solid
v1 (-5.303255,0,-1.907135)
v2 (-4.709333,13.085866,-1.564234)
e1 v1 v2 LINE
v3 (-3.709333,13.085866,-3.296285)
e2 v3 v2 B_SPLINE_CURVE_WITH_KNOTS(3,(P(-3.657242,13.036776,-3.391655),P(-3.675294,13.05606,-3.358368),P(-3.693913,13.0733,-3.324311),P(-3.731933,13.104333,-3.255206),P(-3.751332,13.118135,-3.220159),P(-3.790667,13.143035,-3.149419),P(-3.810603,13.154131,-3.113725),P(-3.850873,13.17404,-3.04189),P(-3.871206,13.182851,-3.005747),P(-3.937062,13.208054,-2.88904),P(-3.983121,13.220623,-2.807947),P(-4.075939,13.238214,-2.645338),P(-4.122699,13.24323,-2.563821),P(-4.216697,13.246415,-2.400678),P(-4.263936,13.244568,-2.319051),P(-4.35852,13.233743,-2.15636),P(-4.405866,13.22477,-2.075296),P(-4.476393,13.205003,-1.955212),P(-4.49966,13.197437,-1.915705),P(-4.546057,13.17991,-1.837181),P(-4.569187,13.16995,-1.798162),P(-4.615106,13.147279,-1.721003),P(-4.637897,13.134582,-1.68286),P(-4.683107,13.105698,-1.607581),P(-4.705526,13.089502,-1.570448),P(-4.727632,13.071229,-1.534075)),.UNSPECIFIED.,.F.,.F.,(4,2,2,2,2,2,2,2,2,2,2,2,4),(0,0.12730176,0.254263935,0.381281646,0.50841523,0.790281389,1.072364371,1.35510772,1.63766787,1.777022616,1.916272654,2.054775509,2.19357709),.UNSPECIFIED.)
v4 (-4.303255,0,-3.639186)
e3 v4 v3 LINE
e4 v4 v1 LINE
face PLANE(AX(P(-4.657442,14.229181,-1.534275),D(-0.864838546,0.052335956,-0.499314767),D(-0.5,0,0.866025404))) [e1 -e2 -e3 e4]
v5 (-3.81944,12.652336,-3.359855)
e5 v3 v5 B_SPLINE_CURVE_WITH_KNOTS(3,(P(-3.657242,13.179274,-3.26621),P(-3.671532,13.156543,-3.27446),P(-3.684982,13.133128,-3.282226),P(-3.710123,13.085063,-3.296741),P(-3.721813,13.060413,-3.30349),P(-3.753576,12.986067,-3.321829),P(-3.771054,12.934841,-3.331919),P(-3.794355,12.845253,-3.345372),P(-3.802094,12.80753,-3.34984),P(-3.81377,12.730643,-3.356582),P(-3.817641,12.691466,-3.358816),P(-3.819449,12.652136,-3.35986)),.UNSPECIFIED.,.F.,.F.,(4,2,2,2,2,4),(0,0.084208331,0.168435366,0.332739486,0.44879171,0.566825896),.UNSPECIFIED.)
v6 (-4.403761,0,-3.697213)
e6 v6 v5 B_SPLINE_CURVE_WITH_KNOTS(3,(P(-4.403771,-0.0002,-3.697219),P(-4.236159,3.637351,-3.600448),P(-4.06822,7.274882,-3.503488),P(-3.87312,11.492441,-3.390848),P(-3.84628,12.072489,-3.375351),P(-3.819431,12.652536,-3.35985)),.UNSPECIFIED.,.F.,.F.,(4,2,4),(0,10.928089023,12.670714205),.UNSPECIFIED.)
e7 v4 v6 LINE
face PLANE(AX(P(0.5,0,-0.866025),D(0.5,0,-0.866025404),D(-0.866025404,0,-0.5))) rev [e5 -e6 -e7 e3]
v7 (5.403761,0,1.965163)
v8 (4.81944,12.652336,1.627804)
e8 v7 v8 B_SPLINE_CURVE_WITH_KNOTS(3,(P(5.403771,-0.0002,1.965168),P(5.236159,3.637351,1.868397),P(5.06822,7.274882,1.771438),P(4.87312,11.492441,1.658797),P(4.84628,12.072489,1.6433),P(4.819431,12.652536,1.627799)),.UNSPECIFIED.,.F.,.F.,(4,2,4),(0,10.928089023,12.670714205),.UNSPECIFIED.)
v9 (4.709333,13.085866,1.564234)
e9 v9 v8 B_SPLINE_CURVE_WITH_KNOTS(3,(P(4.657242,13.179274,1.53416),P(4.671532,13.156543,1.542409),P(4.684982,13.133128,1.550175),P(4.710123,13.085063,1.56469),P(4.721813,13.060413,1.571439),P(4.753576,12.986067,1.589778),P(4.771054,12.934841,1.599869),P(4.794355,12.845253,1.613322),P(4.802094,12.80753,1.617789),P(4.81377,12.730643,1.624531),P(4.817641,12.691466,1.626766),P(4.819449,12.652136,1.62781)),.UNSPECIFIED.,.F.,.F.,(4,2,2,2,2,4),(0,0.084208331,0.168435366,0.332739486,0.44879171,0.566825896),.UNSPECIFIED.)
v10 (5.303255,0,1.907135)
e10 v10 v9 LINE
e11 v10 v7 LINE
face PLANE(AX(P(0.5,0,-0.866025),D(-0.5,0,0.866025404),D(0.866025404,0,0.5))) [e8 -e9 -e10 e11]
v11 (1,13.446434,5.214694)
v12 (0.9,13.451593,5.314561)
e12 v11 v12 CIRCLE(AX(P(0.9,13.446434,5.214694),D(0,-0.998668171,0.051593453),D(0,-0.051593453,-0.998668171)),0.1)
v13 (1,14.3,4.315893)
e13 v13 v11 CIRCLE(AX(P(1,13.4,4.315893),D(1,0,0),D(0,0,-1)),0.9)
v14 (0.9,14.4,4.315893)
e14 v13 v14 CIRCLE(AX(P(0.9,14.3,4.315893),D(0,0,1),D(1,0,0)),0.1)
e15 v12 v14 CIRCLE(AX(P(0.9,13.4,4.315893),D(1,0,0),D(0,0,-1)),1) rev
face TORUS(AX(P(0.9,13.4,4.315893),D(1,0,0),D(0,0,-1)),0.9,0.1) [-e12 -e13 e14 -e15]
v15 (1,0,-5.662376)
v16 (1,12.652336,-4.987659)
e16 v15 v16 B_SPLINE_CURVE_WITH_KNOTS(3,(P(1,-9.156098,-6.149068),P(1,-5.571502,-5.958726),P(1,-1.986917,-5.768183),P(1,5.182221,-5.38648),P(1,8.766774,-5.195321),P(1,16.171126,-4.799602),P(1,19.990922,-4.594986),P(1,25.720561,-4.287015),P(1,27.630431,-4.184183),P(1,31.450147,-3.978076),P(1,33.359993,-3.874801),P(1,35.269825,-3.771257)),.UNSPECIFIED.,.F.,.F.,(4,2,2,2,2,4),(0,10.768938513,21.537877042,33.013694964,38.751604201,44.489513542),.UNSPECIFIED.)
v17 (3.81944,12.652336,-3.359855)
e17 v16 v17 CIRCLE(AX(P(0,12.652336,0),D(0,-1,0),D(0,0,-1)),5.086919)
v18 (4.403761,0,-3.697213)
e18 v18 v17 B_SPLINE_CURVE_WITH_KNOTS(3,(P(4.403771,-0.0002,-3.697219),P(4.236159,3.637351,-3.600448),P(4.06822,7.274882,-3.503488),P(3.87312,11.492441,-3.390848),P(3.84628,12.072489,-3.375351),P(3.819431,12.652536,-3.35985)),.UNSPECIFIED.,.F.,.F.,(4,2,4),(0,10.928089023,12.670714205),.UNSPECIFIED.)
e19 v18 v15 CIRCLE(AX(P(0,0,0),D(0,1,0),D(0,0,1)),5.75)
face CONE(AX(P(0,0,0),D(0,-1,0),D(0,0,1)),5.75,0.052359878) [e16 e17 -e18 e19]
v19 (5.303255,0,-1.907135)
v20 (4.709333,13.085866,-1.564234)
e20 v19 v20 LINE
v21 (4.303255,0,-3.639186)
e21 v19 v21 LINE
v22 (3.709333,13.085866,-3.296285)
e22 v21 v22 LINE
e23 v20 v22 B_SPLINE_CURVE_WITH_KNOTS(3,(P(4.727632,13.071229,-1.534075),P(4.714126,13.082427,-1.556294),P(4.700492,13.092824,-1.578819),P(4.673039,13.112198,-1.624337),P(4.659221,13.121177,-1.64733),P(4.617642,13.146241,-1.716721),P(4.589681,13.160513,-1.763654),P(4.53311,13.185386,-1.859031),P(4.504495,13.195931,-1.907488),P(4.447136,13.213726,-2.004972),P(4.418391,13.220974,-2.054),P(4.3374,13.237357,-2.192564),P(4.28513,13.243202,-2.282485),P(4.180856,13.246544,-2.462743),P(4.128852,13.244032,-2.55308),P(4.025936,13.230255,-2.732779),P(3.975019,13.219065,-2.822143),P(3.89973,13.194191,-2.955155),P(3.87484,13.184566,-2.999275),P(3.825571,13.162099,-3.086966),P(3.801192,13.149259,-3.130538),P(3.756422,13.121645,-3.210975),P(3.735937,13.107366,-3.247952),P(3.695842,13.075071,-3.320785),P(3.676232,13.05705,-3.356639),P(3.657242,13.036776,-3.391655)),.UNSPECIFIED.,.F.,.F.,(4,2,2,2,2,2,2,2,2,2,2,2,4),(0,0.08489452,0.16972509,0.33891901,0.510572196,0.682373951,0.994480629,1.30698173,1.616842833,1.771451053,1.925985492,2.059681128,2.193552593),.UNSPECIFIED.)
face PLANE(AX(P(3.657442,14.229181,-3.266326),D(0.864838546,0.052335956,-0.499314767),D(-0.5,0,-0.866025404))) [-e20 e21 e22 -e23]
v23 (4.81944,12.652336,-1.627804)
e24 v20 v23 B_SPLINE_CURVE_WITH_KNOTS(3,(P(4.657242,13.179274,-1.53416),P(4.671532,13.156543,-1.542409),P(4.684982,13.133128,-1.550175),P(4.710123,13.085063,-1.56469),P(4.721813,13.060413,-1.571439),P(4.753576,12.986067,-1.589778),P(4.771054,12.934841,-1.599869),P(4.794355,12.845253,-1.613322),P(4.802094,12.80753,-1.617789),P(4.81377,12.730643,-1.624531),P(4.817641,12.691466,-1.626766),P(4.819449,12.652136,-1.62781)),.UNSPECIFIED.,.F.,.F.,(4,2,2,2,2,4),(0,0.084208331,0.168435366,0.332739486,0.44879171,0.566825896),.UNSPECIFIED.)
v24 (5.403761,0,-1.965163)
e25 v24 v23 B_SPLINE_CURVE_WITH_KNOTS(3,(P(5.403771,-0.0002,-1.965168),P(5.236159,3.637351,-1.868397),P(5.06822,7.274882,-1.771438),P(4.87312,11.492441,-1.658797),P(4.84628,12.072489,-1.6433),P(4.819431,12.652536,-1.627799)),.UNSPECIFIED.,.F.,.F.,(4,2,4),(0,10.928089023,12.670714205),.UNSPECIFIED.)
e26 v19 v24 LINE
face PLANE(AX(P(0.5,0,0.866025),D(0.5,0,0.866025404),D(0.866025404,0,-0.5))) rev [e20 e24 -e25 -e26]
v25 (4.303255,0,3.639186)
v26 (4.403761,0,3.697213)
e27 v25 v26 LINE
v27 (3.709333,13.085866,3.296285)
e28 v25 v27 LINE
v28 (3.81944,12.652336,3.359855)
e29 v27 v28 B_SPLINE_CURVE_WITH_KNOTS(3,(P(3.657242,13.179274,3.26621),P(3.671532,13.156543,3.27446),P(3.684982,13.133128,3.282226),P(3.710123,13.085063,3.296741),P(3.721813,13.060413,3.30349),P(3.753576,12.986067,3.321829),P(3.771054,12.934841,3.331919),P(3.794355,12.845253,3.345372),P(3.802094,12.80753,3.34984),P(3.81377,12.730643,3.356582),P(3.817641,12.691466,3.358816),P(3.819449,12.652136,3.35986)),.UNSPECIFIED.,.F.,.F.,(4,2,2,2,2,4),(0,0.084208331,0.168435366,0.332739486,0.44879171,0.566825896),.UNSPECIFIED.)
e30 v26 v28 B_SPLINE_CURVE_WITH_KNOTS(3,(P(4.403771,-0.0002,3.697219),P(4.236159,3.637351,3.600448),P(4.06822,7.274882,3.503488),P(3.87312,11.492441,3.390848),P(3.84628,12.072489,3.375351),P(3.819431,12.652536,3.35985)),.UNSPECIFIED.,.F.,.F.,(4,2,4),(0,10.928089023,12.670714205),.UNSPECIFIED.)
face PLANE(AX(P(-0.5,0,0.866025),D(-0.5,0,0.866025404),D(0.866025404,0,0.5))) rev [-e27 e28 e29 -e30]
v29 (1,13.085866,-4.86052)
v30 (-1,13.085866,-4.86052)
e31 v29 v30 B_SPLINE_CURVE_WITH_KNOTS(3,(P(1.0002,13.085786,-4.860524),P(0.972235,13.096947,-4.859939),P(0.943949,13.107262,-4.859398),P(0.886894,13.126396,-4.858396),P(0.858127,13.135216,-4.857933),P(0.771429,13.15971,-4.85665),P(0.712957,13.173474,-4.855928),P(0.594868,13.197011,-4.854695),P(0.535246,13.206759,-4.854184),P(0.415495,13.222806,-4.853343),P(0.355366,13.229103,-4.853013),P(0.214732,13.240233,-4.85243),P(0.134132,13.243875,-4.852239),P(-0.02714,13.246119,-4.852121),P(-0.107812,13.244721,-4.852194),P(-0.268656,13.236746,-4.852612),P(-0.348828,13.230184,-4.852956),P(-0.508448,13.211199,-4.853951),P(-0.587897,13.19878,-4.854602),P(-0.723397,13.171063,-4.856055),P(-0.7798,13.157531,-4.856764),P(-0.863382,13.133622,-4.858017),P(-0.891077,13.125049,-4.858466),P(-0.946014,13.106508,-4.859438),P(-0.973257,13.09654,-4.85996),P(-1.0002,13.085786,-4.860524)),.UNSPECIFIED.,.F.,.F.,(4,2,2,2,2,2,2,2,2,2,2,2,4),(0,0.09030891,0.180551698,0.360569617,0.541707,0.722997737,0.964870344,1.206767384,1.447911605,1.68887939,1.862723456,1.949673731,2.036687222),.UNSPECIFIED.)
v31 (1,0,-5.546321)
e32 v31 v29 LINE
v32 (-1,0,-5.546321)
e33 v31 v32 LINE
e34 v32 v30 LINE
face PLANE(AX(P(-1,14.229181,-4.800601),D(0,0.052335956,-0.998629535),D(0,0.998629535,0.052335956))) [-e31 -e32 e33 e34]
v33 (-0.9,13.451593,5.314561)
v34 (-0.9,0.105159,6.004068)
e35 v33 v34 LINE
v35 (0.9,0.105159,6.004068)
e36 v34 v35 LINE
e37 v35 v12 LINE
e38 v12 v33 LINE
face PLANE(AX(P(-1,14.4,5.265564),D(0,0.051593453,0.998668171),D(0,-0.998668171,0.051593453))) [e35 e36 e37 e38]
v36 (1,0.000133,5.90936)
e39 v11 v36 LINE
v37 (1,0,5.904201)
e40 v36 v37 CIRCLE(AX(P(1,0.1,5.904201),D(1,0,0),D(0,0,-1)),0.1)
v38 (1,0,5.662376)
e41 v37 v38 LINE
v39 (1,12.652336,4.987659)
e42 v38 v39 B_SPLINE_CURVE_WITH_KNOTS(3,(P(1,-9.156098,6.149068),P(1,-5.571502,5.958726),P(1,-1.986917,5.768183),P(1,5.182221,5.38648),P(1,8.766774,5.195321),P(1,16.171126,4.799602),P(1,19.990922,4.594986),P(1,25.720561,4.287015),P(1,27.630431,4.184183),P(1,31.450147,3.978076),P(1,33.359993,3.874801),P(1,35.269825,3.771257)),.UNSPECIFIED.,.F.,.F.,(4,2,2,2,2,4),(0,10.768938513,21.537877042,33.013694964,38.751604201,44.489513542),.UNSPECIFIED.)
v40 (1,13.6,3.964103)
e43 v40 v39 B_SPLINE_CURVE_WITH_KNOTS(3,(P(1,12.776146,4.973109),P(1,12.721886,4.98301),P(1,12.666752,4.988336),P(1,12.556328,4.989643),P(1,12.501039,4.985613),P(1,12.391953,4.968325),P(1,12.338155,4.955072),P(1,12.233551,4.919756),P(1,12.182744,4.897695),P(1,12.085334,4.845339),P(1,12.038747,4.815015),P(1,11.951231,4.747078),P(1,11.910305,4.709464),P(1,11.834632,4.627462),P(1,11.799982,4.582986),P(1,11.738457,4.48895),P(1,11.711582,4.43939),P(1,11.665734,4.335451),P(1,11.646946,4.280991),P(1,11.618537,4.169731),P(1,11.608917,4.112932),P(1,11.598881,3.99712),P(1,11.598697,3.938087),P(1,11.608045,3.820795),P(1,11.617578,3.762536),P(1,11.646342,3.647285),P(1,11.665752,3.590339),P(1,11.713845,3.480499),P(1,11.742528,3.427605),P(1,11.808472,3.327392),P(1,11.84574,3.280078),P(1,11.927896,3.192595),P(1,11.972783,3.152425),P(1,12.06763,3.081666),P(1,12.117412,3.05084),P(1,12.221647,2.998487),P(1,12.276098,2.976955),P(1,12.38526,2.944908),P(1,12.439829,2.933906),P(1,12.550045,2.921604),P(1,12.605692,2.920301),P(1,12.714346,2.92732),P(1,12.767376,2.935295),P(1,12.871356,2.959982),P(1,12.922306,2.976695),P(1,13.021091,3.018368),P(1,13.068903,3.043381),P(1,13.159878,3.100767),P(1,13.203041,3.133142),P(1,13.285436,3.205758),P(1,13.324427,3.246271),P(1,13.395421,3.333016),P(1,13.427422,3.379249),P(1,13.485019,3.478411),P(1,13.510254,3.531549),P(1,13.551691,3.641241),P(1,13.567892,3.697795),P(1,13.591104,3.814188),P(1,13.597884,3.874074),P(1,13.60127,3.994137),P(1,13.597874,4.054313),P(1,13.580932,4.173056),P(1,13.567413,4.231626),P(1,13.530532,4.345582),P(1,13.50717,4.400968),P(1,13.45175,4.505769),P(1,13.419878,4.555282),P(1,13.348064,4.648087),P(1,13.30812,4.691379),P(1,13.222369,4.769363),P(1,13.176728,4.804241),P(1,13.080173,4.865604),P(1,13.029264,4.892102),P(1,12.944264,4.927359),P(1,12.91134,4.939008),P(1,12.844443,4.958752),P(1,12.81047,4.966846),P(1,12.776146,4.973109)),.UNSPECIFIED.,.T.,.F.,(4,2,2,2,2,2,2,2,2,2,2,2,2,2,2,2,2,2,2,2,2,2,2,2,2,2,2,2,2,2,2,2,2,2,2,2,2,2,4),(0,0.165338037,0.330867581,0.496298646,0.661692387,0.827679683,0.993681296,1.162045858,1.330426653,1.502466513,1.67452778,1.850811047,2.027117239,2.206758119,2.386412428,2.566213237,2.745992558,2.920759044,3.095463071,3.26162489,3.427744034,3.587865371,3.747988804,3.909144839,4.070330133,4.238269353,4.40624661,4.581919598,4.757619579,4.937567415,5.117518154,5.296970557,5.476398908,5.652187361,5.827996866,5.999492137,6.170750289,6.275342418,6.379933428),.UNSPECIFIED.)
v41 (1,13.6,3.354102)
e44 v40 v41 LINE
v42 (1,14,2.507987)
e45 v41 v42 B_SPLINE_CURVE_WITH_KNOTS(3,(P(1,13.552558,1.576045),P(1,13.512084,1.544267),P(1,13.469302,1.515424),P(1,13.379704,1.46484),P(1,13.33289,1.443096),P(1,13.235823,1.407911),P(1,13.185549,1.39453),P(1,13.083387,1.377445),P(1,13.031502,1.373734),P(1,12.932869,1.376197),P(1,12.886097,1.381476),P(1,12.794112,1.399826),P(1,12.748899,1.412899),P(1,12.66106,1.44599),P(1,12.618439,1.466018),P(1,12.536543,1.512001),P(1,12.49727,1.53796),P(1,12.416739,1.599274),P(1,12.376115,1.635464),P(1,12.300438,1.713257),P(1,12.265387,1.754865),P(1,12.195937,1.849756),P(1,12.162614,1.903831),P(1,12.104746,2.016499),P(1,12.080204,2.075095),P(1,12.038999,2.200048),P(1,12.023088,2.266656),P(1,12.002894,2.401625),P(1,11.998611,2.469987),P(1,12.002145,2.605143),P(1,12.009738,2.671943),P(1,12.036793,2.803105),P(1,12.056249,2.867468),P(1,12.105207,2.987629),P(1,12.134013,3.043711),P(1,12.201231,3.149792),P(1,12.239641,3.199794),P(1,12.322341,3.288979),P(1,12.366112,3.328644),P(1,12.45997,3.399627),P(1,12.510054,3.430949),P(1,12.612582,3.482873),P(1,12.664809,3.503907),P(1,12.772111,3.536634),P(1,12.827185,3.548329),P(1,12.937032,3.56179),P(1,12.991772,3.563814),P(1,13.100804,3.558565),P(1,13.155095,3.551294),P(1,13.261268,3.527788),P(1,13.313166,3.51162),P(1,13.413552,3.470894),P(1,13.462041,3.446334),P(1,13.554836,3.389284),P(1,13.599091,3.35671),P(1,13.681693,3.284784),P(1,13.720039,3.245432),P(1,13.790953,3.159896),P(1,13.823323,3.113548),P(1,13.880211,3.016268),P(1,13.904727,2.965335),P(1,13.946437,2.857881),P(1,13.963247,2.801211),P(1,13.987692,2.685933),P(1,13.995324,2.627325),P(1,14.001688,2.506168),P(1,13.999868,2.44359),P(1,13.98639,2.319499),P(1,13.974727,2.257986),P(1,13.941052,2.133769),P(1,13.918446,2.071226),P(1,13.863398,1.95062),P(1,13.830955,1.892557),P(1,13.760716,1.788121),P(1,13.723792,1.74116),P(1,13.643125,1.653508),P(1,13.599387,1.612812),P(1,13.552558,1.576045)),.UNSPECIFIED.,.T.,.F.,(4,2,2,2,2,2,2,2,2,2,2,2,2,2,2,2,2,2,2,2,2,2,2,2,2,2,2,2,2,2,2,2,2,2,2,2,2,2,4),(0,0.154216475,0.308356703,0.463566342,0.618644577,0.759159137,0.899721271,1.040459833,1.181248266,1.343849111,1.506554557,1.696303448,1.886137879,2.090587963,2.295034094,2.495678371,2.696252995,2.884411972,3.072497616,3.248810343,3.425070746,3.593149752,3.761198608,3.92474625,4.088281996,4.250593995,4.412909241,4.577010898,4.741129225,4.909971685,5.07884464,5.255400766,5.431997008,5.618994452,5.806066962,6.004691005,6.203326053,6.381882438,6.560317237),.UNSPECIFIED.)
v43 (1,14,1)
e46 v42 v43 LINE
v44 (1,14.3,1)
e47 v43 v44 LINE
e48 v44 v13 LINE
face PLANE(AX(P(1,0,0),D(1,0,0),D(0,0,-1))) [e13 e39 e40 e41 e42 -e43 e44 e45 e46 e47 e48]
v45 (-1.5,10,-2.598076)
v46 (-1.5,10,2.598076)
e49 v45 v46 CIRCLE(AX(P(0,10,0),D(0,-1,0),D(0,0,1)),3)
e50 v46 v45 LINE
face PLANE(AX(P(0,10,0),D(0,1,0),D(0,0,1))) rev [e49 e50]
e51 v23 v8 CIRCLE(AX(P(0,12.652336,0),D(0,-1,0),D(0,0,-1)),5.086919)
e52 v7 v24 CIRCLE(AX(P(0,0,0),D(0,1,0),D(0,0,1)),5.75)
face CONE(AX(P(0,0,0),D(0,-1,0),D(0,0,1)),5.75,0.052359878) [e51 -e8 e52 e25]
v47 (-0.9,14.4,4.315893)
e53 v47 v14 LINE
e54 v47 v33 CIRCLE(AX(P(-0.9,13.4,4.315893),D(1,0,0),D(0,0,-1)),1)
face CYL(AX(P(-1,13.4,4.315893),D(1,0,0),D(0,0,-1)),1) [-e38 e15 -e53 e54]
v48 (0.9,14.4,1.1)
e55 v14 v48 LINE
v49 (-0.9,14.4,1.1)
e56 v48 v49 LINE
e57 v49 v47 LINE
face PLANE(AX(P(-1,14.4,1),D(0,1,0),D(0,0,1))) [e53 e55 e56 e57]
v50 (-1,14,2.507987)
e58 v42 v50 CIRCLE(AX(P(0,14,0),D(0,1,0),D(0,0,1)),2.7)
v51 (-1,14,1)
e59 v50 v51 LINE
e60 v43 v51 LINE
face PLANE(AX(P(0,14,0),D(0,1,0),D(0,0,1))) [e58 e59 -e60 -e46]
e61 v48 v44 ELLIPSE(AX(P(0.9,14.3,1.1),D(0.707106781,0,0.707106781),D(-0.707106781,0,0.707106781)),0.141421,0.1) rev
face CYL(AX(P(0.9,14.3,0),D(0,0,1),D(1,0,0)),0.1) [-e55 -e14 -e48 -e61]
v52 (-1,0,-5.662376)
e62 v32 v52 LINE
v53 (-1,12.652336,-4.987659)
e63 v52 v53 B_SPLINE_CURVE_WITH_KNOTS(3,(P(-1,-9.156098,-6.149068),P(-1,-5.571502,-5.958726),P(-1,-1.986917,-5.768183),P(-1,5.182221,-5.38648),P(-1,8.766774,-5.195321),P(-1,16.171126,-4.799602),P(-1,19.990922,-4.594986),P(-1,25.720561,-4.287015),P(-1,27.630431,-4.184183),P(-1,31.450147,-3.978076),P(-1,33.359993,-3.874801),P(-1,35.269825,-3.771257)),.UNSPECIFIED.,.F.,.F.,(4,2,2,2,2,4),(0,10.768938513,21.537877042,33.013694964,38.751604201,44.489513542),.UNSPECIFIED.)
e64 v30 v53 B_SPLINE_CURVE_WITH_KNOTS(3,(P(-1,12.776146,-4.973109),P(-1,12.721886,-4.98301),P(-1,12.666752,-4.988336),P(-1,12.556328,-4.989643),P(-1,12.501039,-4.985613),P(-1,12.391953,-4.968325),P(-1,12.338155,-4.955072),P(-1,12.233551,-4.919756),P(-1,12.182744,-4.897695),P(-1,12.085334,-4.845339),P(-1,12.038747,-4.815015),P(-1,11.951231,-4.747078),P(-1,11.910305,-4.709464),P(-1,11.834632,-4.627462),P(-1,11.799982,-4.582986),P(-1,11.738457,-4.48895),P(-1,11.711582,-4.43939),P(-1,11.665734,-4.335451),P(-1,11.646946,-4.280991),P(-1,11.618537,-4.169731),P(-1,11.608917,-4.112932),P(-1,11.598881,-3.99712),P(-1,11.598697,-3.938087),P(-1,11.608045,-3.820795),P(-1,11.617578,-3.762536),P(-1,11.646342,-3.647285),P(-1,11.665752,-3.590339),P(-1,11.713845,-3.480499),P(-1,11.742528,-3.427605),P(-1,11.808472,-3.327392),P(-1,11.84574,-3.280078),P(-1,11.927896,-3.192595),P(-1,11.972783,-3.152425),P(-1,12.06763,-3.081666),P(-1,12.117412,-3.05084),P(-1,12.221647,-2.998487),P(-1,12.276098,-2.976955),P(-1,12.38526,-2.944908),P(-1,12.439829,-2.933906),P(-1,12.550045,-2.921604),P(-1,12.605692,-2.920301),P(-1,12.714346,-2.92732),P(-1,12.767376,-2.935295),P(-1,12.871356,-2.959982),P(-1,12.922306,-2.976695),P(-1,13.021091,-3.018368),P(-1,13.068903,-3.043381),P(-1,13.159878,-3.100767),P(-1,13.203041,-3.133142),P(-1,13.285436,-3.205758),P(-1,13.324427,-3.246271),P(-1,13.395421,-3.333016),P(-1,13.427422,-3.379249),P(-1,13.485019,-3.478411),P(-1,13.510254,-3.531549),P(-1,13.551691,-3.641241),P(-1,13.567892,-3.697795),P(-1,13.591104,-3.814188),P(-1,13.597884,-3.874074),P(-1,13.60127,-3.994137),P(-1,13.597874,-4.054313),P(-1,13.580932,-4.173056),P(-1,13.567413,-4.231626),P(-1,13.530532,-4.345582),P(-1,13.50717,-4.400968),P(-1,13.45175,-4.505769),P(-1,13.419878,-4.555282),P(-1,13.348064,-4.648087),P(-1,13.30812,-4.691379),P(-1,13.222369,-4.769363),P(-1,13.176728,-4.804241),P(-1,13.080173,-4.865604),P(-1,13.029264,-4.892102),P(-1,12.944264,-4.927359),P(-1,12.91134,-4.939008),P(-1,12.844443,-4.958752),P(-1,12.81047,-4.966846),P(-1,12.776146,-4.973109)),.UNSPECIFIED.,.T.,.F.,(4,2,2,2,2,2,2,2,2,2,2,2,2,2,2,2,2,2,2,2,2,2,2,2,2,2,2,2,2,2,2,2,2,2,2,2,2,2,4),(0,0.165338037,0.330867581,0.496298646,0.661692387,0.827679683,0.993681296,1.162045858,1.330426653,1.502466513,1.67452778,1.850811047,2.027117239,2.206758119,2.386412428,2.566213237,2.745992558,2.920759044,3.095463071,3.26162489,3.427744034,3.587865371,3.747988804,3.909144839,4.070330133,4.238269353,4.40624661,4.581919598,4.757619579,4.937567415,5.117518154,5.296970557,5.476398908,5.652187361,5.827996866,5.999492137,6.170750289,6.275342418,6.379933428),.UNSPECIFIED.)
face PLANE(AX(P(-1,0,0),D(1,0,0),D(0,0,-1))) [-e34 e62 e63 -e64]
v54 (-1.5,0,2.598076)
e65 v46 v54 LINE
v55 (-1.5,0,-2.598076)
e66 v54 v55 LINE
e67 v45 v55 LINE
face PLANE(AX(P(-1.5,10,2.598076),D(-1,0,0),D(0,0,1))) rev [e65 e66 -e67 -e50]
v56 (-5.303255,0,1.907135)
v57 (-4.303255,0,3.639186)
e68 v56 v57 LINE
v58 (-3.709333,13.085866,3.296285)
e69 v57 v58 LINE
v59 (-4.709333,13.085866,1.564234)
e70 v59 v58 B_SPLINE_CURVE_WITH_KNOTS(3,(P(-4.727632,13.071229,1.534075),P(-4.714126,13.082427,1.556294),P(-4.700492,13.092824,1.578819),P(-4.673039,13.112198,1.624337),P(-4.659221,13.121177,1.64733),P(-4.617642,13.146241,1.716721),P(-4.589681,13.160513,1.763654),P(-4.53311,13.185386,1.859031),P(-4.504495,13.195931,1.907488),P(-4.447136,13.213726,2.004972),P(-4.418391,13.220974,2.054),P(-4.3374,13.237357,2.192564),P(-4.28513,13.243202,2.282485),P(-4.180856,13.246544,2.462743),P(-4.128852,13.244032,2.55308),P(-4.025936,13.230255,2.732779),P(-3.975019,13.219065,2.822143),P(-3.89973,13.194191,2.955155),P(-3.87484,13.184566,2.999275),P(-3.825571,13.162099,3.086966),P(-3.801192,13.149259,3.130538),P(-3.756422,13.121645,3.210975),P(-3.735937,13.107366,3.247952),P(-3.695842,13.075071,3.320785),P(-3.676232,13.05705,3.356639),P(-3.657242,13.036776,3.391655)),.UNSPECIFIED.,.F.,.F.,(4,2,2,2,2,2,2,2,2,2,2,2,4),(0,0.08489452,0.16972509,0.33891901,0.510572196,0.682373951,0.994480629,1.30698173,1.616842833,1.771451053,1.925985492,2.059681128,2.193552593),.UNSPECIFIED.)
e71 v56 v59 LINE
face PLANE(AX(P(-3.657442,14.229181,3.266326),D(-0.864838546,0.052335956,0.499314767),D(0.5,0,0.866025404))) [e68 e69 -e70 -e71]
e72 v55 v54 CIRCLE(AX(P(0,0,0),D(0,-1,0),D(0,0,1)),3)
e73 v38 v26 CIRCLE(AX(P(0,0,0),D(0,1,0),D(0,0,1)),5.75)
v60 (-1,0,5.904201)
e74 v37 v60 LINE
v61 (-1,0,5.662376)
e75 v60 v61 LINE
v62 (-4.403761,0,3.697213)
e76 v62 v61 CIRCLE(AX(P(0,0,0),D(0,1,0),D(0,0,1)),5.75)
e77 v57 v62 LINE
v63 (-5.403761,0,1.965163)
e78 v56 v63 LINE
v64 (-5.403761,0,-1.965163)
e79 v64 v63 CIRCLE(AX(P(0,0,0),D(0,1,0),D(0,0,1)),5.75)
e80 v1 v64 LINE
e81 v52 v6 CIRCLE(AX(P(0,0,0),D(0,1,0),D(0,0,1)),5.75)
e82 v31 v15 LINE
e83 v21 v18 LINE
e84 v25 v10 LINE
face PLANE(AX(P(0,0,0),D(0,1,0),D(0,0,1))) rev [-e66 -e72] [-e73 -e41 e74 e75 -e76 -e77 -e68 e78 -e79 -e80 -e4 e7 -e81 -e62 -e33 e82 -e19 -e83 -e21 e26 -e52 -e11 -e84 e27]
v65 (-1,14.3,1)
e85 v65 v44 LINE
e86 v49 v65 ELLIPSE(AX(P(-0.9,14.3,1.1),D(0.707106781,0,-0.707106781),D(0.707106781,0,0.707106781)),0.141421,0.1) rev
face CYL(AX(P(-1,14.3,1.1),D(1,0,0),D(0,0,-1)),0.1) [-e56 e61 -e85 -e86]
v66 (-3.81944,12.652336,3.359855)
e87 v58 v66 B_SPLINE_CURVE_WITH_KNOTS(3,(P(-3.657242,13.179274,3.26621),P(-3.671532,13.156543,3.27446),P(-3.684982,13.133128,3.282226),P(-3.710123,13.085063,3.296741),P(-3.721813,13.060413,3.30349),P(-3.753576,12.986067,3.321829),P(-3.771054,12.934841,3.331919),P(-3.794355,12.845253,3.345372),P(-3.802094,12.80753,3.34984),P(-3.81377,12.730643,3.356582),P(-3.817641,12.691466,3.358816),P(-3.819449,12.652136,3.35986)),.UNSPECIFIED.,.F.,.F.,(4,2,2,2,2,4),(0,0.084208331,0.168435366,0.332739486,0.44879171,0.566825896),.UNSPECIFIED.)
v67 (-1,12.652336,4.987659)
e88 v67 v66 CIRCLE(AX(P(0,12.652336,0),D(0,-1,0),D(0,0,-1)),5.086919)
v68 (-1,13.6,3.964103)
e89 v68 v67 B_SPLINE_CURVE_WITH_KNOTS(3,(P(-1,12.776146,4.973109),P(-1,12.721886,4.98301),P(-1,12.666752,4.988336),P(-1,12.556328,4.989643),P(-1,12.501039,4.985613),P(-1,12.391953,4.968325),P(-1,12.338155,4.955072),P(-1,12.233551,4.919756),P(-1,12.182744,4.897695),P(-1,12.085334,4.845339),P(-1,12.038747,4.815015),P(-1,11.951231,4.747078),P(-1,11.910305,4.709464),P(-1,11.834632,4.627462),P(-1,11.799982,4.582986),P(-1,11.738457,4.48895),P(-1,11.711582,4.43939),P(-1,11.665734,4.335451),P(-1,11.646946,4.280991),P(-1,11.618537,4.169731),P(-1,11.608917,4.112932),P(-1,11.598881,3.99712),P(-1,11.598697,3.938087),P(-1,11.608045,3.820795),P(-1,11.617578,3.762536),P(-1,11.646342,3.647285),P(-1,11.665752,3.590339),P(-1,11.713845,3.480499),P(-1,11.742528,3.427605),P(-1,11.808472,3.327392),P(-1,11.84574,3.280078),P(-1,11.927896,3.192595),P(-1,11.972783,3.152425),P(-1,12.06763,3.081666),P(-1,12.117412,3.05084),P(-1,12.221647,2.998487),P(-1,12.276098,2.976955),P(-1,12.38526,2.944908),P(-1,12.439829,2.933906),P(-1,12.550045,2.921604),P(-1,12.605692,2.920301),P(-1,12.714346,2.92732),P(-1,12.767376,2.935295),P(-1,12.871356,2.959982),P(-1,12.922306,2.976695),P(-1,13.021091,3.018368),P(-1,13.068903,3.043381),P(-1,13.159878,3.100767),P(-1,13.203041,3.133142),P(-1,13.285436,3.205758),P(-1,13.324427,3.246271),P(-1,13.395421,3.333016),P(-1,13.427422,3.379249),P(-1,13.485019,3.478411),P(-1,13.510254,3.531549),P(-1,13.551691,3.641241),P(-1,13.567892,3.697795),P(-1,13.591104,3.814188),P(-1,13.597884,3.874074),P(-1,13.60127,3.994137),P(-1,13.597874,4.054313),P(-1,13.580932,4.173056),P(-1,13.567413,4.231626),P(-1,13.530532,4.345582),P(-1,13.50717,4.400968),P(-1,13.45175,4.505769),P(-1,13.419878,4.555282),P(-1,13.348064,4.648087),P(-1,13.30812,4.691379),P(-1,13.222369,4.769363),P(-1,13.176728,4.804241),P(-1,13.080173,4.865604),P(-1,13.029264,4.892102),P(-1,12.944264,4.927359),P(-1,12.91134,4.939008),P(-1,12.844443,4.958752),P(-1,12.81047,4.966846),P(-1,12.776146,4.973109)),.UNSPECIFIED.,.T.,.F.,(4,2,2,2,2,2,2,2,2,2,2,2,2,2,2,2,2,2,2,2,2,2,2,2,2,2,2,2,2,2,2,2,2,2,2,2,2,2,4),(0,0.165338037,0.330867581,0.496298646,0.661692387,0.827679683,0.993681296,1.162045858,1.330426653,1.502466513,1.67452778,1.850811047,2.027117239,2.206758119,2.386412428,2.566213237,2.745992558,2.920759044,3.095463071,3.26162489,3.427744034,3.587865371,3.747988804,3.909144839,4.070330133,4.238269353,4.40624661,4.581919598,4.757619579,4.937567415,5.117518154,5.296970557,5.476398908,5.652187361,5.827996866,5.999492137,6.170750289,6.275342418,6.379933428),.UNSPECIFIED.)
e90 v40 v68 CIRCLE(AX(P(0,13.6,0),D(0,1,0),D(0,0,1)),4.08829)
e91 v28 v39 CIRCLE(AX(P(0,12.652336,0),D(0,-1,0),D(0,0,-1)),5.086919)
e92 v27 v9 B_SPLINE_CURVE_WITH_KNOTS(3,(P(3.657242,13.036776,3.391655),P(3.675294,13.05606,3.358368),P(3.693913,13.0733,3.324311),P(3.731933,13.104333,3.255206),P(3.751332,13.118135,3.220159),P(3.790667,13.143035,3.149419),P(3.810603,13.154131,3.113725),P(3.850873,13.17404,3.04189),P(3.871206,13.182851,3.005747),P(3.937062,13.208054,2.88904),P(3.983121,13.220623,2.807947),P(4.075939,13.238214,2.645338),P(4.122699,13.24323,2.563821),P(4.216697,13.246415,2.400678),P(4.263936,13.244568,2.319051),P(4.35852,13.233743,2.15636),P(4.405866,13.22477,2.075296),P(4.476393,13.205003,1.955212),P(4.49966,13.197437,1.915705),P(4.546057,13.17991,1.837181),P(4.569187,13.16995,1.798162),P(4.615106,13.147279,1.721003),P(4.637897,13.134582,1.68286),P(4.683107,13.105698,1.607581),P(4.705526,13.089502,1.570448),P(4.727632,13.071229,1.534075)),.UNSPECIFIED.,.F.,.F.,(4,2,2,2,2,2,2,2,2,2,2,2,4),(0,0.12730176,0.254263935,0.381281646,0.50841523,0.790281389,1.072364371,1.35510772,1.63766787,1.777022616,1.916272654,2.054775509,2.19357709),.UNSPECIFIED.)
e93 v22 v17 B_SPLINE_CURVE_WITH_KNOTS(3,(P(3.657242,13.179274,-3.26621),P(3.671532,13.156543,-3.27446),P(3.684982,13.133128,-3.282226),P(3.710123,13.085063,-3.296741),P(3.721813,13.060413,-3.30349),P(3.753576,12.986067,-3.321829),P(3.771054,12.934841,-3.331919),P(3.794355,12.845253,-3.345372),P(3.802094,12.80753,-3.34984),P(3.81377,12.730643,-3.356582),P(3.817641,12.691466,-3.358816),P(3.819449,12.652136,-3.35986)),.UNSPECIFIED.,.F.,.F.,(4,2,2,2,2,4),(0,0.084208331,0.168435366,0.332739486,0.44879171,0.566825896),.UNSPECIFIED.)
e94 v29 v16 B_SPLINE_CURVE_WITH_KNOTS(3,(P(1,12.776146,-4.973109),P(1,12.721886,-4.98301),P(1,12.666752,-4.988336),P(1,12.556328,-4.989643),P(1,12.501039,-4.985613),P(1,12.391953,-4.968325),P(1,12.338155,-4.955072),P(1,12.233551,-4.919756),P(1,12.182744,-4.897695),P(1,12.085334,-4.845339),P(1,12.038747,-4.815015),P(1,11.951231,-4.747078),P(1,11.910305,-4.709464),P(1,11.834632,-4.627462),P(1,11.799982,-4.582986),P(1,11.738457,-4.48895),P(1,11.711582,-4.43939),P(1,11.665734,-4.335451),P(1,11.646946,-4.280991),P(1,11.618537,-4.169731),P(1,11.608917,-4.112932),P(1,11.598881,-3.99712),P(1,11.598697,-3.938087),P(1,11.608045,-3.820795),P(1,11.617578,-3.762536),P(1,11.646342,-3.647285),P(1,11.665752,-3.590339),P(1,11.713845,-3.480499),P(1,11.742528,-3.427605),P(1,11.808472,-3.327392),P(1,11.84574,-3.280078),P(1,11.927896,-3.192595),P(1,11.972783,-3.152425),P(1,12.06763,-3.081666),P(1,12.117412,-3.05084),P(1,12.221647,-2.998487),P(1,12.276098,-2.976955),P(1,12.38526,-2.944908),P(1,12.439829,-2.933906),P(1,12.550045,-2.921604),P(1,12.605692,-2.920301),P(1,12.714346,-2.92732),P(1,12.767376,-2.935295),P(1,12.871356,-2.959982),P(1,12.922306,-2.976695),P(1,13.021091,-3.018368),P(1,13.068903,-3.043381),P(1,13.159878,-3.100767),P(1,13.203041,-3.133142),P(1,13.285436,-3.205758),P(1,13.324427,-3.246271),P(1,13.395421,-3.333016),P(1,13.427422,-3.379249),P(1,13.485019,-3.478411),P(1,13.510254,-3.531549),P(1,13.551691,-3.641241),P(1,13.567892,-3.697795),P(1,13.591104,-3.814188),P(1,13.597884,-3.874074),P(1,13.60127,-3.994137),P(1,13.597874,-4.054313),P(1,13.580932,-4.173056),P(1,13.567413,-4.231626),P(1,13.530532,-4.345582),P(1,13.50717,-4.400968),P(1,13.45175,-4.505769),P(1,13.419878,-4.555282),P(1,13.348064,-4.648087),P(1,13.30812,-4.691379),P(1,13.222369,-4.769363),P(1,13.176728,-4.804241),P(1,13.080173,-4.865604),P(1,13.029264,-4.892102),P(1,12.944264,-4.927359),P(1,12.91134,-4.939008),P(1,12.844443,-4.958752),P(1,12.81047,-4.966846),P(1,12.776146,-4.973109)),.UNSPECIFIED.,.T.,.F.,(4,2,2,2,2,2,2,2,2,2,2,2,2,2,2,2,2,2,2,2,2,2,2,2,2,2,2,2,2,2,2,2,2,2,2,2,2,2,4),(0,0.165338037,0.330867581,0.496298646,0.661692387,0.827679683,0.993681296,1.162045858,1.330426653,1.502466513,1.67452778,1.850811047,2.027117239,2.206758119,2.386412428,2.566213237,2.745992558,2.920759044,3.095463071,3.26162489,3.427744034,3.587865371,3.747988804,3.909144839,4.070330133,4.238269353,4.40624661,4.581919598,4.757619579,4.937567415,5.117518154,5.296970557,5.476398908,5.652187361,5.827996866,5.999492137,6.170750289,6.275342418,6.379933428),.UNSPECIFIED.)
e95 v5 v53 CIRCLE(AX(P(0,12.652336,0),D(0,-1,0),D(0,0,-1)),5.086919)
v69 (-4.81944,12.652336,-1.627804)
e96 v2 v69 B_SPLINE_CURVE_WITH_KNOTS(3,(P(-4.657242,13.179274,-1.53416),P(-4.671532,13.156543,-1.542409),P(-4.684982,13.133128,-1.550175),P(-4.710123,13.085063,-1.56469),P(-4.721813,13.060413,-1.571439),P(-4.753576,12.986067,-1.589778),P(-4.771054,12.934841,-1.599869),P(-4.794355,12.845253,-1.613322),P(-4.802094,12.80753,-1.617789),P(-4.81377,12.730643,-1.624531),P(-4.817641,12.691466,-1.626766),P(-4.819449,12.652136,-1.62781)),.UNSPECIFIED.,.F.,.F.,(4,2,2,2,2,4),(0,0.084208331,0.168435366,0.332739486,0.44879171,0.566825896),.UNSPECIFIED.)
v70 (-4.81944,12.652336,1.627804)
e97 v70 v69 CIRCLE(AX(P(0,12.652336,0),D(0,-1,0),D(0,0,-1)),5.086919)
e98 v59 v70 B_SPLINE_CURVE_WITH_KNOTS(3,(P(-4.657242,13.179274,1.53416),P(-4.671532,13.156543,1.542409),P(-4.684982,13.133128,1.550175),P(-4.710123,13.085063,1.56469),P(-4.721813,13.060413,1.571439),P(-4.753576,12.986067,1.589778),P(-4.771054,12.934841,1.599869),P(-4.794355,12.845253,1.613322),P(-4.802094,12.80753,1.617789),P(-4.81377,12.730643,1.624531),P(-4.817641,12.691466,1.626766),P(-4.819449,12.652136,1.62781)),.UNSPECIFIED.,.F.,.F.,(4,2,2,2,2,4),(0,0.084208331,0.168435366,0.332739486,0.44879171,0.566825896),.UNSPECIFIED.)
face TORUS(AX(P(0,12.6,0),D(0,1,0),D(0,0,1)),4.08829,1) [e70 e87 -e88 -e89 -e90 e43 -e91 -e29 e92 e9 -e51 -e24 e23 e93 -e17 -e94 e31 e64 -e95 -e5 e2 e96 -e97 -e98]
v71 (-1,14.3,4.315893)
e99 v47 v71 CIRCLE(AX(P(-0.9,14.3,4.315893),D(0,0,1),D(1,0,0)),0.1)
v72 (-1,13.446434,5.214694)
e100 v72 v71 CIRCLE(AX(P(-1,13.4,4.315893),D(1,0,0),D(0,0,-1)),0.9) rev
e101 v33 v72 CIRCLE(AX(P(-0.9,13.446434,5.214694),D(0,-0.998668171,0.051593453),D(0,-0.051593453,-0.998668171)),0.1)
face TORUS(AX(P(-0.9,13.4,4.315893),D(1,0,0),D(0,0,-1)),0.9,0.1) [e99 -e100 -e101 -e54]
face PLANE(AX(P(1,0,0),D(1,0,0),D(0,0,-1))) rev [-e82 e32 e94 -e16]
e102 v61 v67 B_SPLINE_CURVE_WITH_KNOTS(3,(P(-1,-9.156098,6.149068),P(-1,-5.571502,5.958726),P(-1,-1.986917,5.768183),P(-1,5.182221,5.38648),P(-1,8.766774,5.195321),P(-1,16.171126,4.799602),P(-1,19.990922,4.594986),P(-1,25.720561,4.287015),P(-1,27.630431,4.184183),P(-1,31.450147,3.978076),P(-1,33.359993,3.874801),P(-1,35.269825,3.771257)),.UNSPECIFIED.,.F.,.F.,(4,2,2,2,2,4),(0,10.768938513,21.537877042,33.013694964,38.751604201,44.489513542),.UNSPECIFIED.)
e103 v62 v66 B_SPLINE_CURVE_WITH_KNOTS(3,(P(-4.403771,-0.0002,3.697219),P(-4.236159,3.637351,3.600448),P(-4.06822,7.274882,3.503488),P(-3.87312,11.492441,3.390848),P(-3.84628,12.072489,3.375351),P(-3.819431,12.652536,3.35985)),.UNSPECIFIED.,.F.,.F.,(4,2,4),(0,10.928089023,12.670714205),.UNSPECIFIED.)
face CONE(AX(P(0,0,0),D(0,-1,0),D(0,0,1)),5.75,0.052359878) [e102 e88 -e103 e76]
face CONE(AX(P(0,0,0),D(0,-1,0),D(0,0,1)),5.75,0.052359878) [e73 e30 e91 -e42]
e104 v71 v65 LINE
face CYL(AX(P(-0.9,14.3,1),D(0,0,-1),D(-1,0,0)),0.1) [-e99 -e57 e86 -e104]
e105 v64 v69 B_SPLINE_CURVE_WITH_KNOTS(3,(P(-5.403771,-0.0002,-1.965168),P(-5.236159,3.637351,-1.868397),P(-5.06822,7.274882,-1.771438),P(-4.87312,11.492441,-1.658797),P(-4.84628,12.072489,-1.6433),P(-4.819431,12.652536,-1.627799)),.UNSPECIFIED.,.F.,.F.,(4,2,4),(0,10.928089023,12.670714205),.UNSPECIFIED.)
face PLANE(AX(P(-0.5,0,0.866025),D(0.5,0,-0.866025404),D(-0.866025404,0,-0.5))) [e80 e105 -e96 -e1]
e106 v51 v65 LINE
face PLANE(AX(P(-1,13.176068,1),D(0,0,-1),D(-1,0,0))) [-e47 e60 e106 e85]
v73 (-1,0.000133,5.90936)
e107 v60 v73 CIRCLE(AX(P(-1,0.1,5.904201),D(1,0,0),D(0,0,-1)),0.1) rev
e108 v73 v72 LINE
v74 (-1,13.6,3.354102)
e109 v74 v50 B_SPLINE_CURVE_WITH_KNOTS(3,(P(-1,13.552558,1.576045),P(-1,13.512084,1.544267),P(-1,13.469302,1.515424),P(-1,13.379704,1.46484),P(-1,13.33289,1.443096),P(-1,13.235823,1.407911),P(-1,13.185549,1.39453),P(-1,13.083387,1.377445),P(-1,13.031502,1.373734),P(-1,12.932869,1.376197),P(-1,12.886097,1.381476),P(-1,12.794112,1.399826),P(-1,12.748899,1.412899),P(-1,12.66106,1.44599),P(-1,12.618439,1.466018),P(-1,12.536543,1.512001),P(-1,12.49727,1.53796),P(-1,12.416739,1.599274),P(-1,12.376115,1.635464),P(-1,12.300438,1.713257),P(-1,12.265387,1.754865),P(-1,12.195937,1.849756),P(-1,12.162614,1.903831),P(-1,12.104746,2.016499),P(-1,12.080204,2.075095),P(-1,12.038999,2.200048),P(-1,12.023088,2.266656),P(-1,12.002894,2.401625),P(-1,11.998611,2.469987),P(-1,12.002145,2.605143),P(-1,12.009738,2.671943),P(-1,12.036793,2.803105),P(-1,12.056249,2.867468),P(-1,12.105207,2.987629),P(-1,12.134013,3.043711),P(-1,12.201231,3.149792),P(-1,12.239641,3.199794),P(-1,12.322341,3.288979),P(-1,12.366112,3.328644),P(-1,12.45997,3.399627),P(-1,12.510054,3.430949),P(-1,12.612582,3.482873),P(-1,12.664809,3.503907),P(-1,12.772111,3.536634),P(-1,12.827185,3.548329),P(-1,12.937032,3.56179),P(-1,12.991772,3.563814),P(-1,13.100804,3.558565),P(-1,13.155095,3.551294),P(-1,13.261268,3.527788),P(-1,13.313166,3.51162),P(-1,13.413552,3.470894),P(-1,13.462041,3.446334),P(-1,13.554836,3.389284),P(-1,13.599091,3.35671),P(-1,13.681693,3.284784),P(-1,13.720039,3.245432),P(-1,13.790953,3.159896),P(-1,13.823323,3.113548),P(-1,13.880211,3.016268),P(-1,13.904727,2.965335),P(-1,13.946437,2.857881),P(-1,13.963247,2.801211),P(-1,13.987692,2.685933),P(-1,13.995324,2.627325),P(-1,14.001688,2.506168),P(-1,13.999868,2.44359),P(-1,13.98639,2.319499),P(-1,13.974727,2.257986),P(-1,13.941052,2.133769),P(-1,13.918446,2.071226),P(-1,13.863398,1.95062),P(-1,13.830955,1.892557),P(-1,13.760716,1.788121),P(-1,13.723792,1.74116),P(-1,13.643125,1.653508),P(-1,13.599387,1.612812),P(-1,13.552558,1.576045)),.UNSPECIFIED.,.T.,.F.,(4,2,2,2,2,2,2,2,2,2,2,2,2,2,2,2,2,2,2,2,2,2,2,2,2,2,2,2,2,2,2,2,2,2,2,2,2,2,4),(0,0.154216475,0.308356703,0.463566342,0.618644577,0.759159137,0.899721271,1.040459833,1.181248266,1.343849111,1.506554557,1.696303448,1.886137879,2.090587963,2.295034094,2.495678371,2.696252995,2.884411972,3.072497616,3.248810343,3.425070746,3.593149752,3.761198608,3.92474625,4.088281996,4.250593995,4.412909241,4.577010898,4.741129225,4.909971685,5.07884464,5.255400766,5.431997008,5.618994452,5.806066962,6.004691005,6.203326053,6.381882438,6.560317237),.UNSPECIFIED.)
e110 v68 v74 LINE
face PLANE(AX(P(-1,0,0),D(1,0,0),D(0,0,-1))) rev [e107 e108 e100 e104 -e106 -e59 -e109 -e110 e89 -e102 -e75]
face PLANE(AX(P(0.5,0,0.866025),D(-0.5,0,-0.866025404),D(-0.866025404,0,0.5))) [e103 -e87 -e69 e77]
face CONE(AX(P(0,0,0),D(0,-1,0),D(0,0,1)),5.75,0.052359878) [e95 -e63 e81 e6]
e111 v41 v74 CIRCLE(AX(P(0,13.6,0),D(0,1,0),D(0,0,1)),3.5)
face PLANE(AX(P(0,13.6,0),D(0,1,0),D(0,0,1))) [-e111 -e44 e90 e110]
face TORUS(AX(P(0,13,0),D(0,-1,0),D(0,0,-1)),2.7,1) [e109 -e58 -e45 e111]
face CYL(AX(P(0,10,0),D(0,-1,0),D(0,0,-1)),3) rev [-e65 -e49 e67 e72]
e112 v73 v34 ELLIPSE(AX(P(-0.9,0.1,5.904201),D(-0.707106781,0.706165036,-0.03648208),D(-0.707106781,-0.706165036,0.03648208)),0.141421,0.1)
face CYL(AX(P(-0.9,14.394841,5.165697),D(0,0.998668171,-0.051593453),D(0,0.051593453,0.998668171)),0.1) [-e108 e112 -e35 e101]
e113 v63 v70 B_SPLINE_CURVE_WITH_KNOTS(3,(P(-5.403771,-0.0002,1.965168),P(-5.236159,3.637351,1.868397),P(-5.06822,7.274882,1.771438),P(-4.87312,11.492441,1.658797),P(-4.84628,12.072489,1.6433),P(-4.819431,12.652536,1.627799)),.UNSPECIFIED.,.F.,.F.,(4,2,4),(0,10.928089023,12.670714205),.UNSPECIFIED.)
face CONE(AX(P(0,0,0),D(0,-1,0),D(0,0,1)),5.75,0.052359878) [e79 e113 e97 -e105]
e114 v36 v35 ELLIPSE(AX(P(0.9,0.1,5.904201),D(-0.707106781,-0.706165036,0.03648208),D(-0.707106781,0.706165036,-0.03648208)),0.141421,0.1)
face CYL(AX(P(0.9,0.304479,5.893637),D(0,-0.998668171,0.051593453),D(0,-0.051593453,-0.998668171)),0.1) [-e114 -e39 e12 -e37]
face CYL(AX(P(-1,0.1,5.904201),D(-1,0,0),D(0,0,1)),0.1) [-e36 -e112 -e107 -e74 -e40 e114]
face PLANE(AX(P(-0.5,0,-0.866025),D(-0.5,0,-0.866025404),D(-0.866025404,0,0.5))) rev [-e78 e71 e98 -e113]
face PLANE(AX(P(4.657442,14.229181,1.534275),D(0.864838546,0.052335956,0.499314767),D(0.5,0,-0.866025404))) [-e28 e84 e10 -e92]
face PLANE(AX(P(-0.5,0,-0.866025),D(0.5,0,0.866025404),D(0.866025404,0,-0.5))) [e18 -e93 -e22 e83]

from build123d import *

# Parameters (mm, degrees)
SKETCH1_R                = 5.75
BOSS_EXTRUDE1_DEPTH      = 14
BOSS_EXTRUDE1_TAPER      = 3
SKETCH2_OUTSIDE_W        = 17.792
SKETCH2_OUTSIDE_H        = 17.792
SKETCH2_OUTSIDE_R        = 3.5
CUT_EXTRUDE1_DEPTH       = 0.4
FILLET2_R                = 1
FILLET3_R                = 1
CUT_EXTRUDE2_DEPTH       = 1
CIRPATTERN1_COUNT        = 6
BOSS_EXTRUDE2_DEPTH      = 1
BOSS_EXTRUDE2_DEPTH_BACK = 1
FILLET4_R                = 1
FILLET5_R                = 0.1
CUT_EXTRUDE3_DEPTH       = 10


with BuildPart() as part:
    # Sketch1 → Boss-Extrude1 (new body)
    with BuildSketch(Plane(origin=(0, 0, 0), x_dir=(1, 0, 0), z_dir=(0, 1, 0))):
        Circle(SKETCH1_R)
    extrude(amount=BOSS_EXTRUDE1_DEPTH, taper=BOSS_EXTRUDE1_TAPER)

    # Sketch2 outside → Cut-Extrude1 (cut)
    with BuildSketch(Plane(origin=(0, 14, 0), x_dir=(1, 0, 0), z_dir=(0, 1, 0))):
        Rectangle(SKETCH2_OUTSIDE_W, SKETCH2_OUTSIDE_H)
        with Locations(Location((0, 0, 0), (0, 0, 270))):
            Circle(SKETCH2_OUTSIDE_R, mode=Mode.SUBTRACT)
    extrude(amount=-CUT_EXTRUDE1_DEPTH, mode=Mode.SUBTRACT)

    # Fillet2
    # the kernel refuses this fillet: 1 mm, written as the material it takes off along each edge
    with BuildSketch(Plane(origin=(0, 14, 0), x_dir=(0, 0, 1), z_dir=(-1, 0, 0))) as fillet2_piece_1:
        with BuildLine():
            CenterArc((2.7, -1), FILLET2_R, 36.869897646, 53.130102354)
            Line((2.7, 0), (2.7, 0.02))
            Line((2.7, 0.02), (3.5, 0.02))
            Line((3.5, 0.02), (3.52, 0))
            ThreePointArc((3.52, 0), (3.52, -0.2), (3.516, -0.388))
            Line((3.516, -0.388), (3.5, -0.4))
        make_face()
    revolve(axis=Axis((0, 14, 0), (0, 1, 0)), mode=Mode.SUBTRACT)

    # Fillet3
    fillet3_edges = [part.edges().sort_by_distance(p)[0] for p in [
        (-5.037254202, 13.6, 0),
    ]]
    fillet(fillet3_edges, radius=FILLET3_R)

    # Sketch3 → Cut-Extrude2 (cut, symmetric)
    with BuildSketch(Plane(origin=(0, 0, 0), x_dir=(0, 0, -1), z_dir=(1, 0, 0))):
        Polygon((-6.905330432, 14.229180533), (-4.800601017, 14.229180533), (-5.581491189, -0.671091575), (-7.885175425, -0.671091575), align=None)
    cut_extrude2 = extrude(amount=CUT_EXTRUDE2_DEPTH, both=True, mode=Mode.SUBTRACT)

    # CirPattern1: Cut-Extrude2 ×6 about axis
    cirpattern1_axis = Axis((0, 0, 0), (0, 1, 0))
    for i in range(1, CIRPATTERN1_COUNT):
        add(cut_extrude2.rotate(cirpattern1_axis, i * 360 / CIRPATTERN1_COUNT), mode=Mode.SUBTRACT)

    # Sketch5 → Boss-Extrude2 (add, two sides: drawn at the far end of the back side and taken through both)
    with BuildSketch(Plane(origin=(0, 0, 0), x_dir=(0, 0, -1), z_dir=(1, 0, 0)).offset(-BOSS_EXTRUDE2_DEPTH_BACK)):
        Polygon((-5.265563969, 0), (-4.679794572, 13.176067739), (-1, 13.176067739), (-1, 14.4), (-5.265563969, 14.4), (-6.009500485, 0), align=None)
    extrude(amount=BOSS_EXTRUDE2_DEPTH + BOSS_EXTRUDE2_DEPTH_BACK)

    # Fillet4
    fillet4_edges = [part.edges().sort_by_distance(p)[0] for p in [
        (0, 14.4, 5.265563969),
    ]]
    fillet(fillet4_edges, radius=FILLET4_R)

    # Fillet5
    fillet5_edges = [part.edges().sort_by_distance(p)[0] for p in [
        (0, 0, 6.009500485),
        (-1, 14.4, 2.657946311),
        (0, 14.4, 1),
        (1, 14.4, 2.657946311),
        (1, 6.725796726, 5.662030639),
        (1, 14.125118422, 5.004516811),
        (-1, 6.725796726, 5.662030639),
        (-1, 14.125118422, 5.004516811),
    ]]
    fillet(fillet5_edges, radius=FILLET5_R)

    # Sketch6 → Cut-Extrude3 (cut)
    with BuildSketch(Plane.XZ):
        with BuildLine():
            Line((-1.5, 2.598076211), (-1.5, -2.598076211))
            ThreePointArc((-1.5, -2.598076211), (3, 0), (-1.5, 2.598076211))
        make_face()
    extrude(amount=-CUT_EXTRUDE3_DEPTH, mode=Mode.SUBTRACT)


solid = part.part
